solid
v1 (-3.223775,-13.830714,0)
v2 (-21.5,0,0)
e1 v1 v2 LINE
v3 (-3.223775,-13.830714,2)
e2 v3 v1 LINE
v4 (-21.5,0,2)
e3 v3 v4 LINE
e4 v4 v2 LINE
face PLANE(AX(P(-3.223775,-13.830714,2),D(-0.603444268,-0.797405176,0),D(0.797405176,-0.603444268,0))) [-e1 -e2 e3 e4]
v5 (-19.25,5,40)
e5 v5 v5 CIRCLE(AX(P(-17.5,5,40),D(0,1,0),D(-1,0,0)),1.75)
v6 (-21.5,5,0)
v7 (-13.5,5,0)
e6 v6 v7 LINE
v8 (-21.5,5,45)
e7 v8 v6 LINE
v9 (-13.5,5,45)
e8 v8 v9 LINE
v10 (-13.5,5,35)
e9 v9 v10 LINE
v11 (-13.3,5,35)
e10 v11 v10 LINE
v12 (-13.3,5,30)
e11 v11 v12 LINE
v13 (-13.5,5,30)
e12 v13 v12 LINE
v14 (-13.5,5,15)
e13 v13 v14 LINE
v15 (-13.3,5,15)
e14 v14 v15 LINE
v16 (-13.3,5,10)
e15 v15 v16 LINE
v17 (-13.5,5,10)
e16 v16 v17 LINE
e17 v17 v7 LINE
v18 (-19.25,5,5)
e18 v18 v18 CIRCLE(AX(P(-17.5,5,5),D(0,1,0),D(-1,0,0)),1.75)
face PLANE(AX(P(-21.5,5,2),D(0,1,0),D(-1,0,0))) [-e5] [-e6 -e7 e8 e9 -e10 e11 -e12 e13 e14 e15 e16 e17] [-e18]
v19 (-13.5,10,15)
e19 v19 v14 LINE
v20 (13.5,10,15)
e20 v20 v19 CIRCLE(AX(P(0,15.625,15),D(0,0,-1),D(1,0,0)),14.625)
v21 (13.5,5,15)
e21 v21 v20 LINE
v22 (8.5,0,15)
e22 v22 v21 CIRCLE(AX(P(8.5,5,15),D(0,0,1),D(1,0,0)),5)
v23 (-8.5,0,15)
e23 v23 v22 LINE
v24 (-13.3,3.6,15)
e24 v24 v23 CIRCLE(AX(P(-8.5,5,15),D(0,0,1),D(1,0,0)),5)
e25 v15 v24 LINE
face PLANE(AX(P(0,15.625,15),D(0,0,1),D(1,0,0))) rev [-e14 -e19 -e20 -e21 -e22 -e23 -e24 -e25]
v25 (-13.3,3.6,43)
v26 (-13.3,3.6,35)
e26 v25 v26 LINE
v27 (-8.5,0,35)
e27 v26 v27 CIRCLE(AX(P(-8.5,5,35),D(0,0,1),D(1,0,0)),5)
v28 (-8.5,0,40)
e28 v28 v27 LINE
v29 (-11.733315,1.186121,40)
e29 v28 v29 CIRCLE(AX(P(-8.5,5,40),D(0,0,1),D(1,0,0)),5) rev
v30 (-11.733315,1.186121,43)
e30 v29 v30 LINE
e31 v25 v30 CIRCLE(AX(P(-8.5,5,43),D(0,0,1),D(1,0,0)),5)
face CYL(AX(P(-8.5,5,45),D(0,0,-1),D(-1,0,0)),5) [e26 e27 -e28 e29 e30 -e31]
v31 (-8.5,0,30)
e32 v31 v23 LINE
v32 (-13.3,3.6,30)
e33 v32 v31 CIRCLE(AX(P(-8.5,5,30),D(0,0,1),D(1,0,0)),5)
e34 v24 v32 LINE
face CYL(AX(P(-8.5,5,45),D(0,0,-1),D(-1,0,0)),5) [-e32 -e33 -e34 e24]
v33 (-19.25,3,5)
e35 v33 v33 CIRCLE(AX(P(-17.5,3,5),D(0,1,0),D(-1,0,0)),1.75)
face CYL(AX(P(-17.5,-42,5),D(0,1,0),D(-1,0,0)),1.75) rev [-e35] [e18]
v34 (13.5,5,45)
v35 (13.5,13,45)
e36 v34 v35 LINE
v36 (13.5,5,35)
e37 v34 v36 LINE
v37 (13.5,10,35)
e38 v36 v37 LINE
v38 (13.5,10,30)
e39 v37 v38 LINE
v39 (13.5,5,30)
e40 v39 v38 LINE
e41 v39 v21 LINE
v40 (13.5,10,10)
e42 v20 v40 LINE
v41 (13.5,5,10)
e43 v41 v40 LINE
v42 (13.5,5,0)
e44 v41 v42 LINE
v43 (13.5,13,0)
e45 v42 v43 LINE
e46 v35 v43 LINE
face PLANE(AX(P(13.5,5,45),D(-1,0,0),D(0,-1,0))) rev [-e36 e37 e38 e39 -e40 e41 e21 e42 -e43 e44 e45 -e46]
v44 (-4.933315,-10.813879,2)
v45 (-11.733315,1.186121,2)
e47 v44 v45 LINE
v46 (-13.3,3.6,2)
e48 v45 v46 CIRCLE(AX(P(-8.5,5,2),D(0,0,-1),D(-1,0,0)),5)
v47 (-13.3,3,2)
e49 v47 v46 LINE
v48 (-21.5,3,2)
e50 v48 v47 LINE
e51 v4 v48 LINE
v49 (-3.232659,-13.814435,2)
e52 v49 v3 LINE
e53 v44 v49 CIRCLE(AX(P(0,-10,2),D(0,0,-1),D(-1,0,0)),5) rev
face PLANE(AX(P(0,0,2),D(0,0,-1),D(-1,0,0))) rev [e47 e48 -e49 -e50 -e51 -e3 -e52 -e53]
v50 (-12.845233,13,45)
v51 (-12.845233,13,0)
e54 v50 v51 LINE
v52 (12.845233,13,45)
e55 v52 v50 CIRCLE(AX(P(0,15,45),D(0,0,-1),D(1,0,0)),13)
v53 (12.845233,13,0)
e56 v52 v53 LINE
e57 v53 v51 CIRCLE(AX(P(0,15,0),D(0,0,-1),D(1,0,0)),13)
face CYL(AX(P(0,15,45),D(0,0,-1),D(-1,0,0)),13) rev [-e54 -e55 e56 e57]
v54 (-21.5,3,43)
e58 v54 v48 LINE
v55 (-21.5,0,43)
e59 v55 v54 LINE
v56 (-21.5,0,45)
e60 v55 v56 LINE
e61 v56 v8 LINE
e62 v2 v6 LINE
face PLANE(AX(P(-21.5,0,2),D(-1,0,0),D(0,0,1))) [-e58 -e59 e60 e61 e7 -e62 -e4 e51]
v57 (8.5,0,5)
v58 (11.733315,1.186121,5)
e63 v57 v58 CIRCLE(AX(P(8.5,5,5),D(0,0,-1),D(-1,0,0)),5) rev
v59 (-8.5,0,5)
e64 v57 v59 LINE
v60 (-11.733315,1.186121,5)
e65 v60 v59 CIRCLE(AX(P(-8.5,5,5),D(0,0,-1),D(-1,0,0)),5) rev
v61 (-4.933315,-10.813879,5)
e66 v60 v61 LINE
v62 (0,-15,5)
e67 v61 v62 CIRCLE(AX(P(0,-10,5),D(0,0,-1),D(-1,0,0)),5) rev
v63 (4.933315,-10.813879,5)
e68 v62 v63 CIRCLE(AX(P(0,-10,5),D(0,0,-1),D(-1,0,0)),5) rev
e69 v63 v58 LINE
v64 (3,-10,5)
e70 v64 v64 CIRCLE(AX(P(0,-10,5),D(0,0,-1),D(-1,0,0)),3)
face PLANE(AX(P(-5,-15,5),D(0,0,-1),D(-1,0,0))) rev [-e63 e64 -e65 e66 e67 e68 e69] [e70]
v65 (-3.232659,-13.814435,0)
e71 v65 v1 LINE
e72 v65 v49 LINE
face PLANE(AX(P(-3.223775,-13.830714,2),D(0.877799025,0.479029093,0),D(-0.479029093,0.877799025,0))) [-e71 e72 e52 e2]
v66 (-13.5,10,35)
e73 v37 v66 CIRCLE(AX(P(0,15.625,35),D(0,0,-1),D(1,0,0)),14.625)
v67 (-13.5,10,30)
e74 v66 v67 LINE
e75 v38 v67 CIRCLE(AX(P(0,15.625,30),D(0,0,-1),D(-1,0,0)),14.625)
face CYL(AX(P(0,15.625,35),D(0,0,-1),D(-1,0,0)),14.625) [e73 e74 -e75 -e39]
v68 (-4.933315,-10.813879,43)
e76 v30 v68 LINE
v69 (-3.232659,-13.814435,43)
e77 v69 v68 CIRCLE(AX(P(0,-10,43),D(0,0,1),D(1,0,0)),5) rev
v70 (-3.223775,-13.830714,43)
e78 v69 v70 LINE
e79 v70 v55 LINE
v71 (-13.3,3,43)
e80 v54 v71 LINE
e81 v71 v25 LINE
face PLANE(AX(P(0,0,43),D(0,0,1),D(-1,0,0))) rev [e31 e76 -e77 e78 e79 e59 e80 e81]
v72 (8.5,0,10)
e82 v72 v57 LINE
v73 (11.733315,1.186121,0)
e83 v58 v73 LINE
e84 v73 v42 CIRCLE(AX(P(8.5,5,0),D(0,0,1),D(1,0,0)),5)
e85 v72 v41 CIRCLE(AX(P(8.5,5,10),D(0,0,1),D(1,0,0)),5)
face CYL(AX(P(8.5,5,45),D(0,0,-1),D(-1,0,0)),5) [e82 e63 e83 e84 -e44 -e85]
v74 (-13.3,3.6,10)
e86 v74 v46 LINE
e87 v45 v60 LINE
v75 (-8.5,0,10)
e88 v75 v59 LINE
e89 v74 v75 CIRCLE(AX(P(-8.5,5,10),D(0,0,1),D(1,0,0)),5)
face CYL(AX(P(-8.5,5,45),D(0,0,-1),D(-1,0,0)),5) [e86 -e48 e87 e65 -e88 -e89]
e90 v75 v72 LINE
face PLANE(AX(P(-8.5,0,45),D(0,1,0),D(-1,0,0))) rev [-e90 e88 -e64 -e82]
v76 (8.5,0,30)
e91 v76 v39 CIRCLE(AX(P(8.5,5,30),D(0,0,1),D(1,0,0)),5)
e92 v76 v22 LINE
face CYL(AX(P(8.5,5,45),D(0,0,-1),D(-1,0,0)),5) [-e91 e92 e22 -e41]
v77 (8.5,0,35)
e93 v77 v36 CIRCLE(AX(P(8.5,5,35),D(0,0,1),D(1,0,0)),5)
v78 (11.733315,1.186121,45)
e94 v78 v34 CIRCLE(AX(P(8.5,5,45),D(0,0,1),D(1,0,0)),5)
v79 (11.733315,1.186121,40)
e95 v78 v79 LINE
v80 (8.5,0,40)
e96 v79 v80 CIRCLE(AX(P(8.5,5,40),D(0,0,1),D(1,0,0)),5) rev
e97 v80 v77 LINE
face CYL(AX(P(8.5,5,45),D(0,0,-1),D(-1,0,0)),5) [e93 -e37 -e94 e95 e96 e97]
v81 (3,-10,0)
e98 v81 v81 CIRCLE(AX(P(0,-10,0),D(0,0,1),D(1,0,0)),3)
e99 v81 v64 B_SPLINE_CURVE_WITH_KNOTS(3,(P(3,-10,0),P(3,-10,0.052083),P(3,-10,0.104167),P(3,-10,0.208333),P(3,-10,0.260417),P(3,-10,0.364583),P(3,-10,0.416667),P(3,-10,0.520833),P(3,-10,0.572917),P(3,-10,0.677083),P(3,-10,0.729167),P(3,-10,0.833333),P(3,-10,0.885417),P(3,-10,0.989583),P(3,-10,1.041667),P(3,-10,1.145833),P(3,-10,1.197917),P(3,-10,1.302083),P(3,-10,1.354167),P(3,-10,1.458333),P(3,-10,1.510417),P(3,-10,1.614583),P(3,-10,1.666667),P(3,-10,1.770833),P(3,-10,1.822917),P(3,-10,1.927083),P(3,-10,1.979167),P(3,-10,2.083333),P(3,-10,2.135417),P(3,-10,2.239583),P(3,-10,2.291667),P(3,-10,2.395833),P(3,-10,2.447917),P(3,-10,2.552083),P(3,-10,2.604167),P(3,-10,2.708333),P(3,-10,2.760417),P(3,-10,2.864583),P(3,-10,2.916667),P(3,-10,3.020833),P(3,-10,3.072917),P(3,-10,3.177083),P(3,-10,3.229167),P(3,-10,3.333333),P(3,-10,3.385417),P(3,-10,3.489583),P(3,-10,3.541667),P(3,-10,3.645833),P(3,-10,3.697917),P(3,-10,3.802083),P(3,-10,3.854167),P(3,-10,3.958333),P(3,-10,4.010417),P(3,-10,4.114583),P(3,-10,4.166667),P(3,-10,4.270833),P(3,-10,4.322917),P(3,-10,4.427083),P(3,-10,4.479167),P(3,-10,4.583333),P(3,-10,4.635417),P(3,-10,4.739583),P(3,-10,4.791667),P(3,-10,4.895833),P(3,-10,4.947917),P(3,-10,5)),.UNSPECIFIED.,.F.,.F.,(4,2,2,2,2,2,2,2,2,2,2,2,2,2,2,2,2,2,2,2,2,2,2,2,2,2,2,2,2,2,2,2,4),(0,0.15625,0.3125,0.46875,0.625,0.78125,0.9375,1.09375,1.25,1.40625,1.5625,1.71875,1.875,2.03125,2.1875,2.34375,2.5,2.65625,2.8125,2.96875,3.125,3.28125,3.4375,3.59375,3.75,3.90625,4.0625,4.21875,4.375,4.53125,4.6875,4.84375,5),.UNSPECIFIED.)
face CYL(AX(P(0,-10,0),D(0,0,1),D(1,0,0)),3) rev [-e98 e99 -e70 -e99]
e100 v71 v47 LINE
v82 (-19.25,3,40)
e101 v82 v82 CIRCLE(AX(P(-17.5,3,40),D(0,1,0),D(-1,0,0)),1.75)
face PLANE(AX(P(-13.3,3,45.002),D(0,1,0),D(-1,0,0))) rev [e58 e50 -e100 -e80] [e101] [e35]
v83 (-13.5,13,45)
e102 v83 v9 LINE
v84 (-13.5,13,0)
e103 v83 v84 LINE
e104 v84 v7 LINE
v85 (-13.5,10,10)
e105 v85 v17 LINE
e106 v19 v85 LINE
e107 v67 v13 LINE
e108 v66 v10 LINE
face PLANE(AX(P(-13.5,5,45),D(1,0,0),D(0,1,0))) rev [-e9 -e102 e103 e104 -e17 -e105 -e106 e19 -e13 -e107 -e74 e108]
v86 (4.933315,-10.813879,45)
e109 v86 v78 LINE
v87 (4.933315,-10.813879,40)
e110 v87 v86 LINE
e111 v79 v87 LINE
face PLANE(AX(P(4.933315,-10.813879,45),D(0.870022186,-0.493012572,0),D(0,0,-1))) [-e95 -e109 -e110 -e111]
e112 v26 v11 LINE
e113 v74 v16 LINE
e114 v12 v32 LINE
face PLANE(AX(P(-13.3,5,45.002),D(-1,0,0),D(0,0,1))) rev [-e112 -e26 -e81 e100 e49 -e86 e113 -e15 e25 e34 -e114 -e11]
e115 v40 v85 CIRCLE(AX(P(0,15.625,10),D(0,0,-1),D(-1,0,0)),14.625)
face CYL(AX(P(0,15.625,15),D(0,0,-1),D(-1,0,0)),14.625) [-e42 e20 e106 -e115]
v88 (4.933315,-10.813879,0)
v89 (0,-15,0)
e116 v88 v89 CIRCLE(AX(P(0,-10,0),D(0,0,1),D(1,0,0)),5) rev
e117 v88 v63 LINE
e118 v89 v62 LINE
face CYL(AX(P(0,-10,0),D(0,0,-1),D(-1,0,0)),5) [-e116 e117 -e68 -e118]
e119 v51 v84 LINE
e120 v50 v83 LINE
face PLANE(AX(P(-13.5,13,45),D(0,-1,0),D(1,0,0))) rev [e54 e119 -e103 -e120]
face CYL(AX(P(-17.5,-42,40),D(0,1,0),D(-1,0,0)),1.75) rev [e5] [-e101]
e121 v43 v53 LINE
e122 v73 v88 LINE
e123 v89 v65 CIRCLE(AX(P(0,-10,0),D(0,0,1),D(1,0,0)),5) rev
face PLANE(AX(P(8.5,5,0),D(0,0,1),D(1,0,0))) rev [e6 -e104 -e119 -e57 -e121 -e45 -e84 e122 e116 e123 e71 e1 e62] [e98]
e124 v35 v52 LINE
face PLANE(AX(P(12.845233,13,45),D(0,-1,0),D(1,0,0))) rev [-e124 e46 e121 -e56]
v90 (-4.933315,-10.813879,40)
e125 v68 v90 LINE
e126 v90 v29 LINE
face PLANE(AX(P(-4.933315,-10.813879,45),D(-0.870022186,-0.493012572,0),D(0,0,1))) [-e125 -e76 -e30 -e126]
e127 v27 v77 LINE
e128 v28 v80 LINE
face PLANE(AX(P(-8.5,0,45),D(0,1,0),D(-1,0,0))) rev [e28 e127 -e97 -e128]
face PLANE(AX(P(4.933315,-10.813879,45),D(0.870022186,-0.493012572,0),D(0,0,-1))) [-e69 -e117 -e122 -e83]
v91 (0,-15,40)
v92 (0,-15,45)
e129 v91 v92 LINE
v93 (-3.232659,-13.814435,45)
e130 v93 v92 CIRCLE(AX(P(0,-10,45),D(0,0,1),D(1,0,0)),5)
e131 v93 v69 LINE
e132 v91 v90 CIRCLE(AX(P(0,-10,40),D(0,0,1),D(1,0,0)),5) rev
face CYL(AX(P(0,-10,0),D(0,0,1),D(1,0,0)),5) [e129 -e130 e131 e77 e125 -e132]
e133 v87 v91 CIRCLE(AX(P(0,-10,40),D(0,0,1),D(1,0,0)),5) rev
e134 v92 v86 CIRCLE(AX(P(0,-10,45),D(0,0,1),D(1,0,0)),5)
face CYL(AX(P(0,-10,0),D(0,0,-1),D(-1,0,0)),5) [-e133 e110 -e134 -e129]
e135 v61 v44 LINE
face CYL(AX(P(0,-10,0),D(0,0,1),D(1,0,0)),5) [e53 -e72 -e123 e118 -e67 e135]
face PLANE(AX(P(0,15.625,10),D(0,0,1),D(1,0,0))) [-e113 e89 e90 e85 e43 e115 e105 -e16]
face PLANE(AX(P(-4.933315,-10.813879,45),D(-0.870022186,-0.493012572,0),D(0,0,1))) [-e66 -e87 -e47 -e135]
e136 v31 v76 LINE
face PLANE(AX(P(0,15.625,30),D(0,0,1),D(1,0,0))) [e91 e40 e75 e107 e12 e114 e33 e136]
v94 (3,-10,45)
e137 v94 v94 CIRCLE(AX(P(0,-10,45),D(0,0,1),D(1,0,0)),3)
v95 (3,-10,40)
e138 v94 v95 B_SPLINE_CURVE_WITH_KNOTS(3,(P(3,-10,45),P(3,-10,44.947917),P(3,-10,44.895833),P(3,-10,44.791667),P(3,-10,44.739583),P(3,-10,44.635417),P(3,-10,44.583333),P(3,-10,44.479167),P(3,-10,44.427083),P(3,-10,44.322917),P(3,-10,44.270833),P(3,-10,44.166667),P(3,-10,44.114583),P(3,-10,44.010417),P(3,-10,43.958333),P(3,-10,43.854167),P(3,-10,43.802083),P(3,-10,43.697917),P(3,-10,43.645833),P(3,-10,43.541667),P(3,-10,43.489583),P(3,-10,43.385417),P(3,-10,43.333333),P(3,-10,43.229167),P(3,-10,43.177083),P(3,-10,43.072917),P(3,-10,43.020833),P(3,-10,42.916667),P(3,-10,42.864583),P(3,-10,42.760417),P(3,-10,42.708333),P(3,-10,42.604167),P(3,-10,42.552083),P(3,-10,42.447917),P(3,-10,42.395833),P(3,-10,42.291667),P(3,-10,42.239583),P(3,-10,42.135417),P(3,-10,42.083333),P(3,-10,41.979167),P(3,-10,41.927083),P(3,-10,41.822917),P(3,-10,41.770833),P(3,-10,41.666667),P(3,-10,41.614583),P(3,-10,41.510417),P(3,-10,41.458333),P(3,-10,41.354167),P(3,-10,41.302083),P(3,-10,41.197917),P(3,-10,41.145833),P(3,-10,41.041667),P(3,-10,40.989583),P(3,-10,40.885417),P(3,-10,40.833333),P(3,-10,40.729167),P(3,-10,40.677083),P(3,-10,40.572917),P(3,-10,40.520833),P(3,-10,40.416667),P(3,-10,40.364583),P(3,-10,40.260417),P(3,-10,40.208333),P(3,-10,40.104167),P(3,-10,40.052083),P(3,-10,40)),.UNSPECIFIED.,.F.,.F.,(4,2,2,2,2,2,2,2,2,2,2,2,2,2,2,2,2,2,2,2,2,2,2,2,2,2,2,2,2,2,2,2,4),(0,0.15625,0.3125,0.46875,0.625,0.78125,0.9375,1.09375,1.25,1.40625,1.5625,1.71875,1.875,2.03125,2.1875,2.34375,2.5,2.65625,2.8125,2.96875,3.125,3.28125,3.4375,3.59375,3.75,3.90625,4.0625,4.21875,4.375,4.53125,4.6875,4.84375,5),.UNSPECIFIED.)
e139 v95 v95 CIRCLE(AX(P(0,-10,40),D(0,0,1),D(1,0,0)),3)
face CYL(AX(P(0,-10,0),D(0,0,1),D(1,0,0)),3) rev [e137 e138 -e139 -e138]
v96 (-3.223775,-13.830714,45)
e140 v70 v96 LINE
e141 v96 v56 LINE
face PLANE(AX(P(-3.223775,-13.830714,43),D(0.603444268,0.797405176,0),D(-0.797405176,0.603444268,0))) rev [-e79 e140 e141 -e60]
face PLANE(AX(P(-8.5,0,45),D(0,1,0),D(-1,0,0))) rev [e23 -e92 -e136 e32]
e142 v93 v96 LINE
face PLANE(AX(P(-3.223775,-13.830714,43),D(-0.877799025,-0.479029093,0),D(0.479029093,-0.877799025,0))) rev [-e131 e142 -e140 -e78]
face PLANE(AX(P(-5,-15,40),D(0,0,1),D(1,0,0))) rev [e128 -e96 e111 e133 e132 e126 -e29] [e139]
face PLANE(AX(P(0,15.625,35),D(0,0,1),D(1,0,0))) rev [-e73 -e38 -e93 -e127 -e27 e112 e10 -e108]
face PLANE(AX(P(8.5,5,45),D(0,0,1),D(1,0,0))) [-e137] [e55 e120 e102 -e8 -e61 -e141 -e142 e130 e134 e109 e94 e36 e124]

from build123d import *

# Parameters (mm, degrees)
BOSS_EXTRUDE1_DEPTH = 45
SKETCH2_W           = 10
SKETCH2_H           = 5
BOSS_EXTRUDE2_DEPTH = 15
SKETCH3_R           = 3
CUT_EXTRUDE1_DEPTH  = 50.317846668
FILLET1_R           = 5
CUT_EXTRUDE2_DEPTH  = 5
LPATTERN1_COUNT     = 2
LPATTERN1_PITCH     = 20
CHAMFER1_DEPTH      = 5
CHAMFER1_START      = 40
CHAMFER1_2_DEPTH    = 5
BOSS_EXTRUDE3_DEPTH = 2
BOSS_EXTRUDE9_REACH = 52.361
SKETCH8_W           = 8.2
SKETCH8_H           = 2
SKETCH9_R           = 1.75
CUT_EXTRUDE4_DEPTH  = 47


with BuildPart() as part:
    # Sketch1 → Boss-Extrude1 (new body)
    with BuildSketch(Plane.XY):
        with BuildLine():
            Line((12.845232579, 13), (13.5, 13))
            Line((13.5, 13), (13.5, 5))
            ThreePointArc((13.5, 5), (12.035533906, 1.464466094), (8.5, 0))
            Line((8.5, 0), (-8.5, 0))
            ThreePointArc((-8.5, 0), (-12.035533906, 1.464466094), (-13.5, 5))
            Line((-13.5, 5), (-13.5, 13))
            Line((-13.5, 13), (-12.845232579, 13))
            ThreePointArc((-12.845232579, 13), (0, 2), (12.845232579, 13))
        make_face()
    extrude(amount=BOSS_EXTRUDE1_DEPTH)

    # Sketch2 → Boss-Extrude2 (add)
    with BuildSketch(Plane.XZ):
        with Locations((0, 42.5)):
            Rectangle(SKETCH2_W, SKETCH2_H)
        with Locations((0, 2.5)):
            Rectangle(SKETCH2_W, SKETCH2_H)
    extrude(amount=BOSS_EXTRUDE2_DEPTH)

    # Sketch3 → Cut-Extrude1 (cut, through all)
    with BuildSketch(Plane.XY.offset(45)):
        with Locations((0, -10)):
            Circle(SKETCH3_R)
    extrude(amount=-CUT_EXTRUDE1_DEPTH, mode=Mode.SUBTRACT)

    # Fillet1
    fillet1_edges = [part.edges().sort_by_distance(p)[0] for p in [
        (-5, -15, 2.5),
        (-5, -15, 42.5),
        (5, -15, 42.5),
        (5, -15, 2.5),
    ]]
    fillet(fillet1_edges, radius=FILLET1_R - 0.0001)  # a hair under: the kernel refuses the full size

    # Sketch4 → Cut-Extrude2 (cut)
    with BuildSketch(Plane.XY.offset(10)):
        with BuildLine():
            Line((-13.5, 10), (-13.5, 5))
            ThreePointArc((-13.5, 5), (-12.035533906, 1.464466094), (-8.5, 0))
            Line((-8.5, 0), (5, 0))
            Line((5, 0), (8.5, 0))
            ThreePointArc((8.5, 0), (12.035533906, 1.464466094), (13.5, 5))
            Line((13.5, 5), (13.5, 10))
            ThreePointArc((13.5, 10), (8.11249037, 3.456264445), (0, 1))
            ThreePointArc((0, 1), (-8.11249037, 3.456264445), (-13.5, 10))
        make_face()
    cut_extrude2 = extrude(amount=CUT_EXTRUDE2_DEPTH, mode=Mode.SUBTRACT)

    # LPattern1: Cut-Extrude2 ×2
    with Locations(*[(0, 0, i * LPATTERN1_PITCH) for i in range(1, LPATTERN1_COUNT)]):
        add(cut_extrude2, mode=Mode.SUBTRACT)

    # Chamfer1: read off the stored shape, not the designer's step
    # Chamfer1 outline → Chamfer1 (add)
    with BuildSketch(Plane.XY):
        with BuildLine():
            ThreePointArc((5, -10), (4.983300978, -10.408303031), (4.933315454, -10.813878757))
            Line((4.933315454, -10.813878757), (11.733315454, 1.186121243))
            ThreePointArc((11.733315454, 1.186121243), (10.222005548, 0.305886996), (8.5, 0))
            Line((8.5, 0), (5, 0))
            Line((5, 0), (5, -10))
        make_face()
        with BuildLine():
            Line((-11.733315454, 1.186121243), (-4.933315454, -10.813878757))
            ThreePointArc((-4.933315454, -10.813878757), (-4.983300978, -10.408303031), (-5, -10))
            Line((-5, -10), (-5, 0))
            Line((-5, 0), (-8.5, 0))
            ThreePointArc((-8.5, 0), (-10.222005548, 0.305886996), (-11.733315454, 1.186121243))
        make_face()
    extrude(amount=CHAMFER1_DEPTH)

    # Chamfer1 2 outline → Chamfer1 2 (add)
    with BuildSketch(Plane.XY.offset(CHAMFER1_START)):
        with BuildLine():
            ThreePointArc((5, -10), (4.983300978, -10.408303031), (4.933315454, -10.813878757))
            Line((4.933315454, -10.813878757), (11.733315454, 1.186121243))
            ThreePointArc((11.733315454, 1.186121243), (10.222005548, 0.305886996), (8.5, 0))
            Line((8.5, 0), (5, 0))
            Line((5, 0), (5, -10))
        make_face()
        with BuildLine():
            Line((-11.733315454, 1.186121243), (-4.933315454, -10.813878757))
            ThreePointArc((-4.933315454, -10.813878757), (-4.983300978, -10.408303031), (-5, -10))
            Line((-5, -10), (-5, 0))
            Line((-5, 0), (-8.5, 0))
            ThreePointArc((-8.5, 0), (-10.222005548, 0.305886996), (-11.733315454, 1.186121243))
        make_face()
    extrude(amount=CHAMFER1_2_DEPTH)

    # Sketch6 → Boss-Extrude3 (add)
    with BuildSketch(Plane(origin=(0, 0, 0), x_dir=(-1, 0, 0), z_dir=(0, 0, -1))):
        Polygon((3.223775495, -13.830713979), (21.5, 0), (21.5, 5), (13.5, 5), align=None)
    boss_extrude3 = extrude(amount=-BOSS_EXTRUDE3_DEPTH)

    # Mirror1: Boss-Extrude3 across plane
    add(boss_extrude3.mirror(Plane.XY.offset(22.5)))

    # Sketch8 → Boss-Extrude9 (add, up to next)
    with BuildSketch(Plane.XY.offset(2), mode=Mode.PRIVATE) as boss_extrude9_sk1:
        with Locations((-17.4, 4)):
            Rectangle(SKETCH8_W, SKETCH8_H)
    boss_extrude9_tool1 = extrude(boss_extrude9_sk1.sketch, amount=BOSS_EXTRUDE9_REACH, mode=Mode.PRIVATE) - part.part
    add(boss_extrude9_tool1.solids().sort_by_distance((-17.4, 4, 2))[0])

    # Sketch9 → Cut-Extrude4 (cut)
    with BuildSketch(Plane(origin=(0, 5, 0), x_dir=(1, 0, 0), z_dir=(0, 1, 0))):
        with Locations(Location((-17.5, -5, 0), (0, 0, 180))):
            Circle(SKETCH9_R)
        with Locations(Location((-17.5, -40, 0), (0, 0, 180))):
            Circle(SKETCH9_R)
    extrude(amount=-CUT_EXTRUDE4_DEPTH, mode=Mode.SUBTRACT)


solid = part.part
